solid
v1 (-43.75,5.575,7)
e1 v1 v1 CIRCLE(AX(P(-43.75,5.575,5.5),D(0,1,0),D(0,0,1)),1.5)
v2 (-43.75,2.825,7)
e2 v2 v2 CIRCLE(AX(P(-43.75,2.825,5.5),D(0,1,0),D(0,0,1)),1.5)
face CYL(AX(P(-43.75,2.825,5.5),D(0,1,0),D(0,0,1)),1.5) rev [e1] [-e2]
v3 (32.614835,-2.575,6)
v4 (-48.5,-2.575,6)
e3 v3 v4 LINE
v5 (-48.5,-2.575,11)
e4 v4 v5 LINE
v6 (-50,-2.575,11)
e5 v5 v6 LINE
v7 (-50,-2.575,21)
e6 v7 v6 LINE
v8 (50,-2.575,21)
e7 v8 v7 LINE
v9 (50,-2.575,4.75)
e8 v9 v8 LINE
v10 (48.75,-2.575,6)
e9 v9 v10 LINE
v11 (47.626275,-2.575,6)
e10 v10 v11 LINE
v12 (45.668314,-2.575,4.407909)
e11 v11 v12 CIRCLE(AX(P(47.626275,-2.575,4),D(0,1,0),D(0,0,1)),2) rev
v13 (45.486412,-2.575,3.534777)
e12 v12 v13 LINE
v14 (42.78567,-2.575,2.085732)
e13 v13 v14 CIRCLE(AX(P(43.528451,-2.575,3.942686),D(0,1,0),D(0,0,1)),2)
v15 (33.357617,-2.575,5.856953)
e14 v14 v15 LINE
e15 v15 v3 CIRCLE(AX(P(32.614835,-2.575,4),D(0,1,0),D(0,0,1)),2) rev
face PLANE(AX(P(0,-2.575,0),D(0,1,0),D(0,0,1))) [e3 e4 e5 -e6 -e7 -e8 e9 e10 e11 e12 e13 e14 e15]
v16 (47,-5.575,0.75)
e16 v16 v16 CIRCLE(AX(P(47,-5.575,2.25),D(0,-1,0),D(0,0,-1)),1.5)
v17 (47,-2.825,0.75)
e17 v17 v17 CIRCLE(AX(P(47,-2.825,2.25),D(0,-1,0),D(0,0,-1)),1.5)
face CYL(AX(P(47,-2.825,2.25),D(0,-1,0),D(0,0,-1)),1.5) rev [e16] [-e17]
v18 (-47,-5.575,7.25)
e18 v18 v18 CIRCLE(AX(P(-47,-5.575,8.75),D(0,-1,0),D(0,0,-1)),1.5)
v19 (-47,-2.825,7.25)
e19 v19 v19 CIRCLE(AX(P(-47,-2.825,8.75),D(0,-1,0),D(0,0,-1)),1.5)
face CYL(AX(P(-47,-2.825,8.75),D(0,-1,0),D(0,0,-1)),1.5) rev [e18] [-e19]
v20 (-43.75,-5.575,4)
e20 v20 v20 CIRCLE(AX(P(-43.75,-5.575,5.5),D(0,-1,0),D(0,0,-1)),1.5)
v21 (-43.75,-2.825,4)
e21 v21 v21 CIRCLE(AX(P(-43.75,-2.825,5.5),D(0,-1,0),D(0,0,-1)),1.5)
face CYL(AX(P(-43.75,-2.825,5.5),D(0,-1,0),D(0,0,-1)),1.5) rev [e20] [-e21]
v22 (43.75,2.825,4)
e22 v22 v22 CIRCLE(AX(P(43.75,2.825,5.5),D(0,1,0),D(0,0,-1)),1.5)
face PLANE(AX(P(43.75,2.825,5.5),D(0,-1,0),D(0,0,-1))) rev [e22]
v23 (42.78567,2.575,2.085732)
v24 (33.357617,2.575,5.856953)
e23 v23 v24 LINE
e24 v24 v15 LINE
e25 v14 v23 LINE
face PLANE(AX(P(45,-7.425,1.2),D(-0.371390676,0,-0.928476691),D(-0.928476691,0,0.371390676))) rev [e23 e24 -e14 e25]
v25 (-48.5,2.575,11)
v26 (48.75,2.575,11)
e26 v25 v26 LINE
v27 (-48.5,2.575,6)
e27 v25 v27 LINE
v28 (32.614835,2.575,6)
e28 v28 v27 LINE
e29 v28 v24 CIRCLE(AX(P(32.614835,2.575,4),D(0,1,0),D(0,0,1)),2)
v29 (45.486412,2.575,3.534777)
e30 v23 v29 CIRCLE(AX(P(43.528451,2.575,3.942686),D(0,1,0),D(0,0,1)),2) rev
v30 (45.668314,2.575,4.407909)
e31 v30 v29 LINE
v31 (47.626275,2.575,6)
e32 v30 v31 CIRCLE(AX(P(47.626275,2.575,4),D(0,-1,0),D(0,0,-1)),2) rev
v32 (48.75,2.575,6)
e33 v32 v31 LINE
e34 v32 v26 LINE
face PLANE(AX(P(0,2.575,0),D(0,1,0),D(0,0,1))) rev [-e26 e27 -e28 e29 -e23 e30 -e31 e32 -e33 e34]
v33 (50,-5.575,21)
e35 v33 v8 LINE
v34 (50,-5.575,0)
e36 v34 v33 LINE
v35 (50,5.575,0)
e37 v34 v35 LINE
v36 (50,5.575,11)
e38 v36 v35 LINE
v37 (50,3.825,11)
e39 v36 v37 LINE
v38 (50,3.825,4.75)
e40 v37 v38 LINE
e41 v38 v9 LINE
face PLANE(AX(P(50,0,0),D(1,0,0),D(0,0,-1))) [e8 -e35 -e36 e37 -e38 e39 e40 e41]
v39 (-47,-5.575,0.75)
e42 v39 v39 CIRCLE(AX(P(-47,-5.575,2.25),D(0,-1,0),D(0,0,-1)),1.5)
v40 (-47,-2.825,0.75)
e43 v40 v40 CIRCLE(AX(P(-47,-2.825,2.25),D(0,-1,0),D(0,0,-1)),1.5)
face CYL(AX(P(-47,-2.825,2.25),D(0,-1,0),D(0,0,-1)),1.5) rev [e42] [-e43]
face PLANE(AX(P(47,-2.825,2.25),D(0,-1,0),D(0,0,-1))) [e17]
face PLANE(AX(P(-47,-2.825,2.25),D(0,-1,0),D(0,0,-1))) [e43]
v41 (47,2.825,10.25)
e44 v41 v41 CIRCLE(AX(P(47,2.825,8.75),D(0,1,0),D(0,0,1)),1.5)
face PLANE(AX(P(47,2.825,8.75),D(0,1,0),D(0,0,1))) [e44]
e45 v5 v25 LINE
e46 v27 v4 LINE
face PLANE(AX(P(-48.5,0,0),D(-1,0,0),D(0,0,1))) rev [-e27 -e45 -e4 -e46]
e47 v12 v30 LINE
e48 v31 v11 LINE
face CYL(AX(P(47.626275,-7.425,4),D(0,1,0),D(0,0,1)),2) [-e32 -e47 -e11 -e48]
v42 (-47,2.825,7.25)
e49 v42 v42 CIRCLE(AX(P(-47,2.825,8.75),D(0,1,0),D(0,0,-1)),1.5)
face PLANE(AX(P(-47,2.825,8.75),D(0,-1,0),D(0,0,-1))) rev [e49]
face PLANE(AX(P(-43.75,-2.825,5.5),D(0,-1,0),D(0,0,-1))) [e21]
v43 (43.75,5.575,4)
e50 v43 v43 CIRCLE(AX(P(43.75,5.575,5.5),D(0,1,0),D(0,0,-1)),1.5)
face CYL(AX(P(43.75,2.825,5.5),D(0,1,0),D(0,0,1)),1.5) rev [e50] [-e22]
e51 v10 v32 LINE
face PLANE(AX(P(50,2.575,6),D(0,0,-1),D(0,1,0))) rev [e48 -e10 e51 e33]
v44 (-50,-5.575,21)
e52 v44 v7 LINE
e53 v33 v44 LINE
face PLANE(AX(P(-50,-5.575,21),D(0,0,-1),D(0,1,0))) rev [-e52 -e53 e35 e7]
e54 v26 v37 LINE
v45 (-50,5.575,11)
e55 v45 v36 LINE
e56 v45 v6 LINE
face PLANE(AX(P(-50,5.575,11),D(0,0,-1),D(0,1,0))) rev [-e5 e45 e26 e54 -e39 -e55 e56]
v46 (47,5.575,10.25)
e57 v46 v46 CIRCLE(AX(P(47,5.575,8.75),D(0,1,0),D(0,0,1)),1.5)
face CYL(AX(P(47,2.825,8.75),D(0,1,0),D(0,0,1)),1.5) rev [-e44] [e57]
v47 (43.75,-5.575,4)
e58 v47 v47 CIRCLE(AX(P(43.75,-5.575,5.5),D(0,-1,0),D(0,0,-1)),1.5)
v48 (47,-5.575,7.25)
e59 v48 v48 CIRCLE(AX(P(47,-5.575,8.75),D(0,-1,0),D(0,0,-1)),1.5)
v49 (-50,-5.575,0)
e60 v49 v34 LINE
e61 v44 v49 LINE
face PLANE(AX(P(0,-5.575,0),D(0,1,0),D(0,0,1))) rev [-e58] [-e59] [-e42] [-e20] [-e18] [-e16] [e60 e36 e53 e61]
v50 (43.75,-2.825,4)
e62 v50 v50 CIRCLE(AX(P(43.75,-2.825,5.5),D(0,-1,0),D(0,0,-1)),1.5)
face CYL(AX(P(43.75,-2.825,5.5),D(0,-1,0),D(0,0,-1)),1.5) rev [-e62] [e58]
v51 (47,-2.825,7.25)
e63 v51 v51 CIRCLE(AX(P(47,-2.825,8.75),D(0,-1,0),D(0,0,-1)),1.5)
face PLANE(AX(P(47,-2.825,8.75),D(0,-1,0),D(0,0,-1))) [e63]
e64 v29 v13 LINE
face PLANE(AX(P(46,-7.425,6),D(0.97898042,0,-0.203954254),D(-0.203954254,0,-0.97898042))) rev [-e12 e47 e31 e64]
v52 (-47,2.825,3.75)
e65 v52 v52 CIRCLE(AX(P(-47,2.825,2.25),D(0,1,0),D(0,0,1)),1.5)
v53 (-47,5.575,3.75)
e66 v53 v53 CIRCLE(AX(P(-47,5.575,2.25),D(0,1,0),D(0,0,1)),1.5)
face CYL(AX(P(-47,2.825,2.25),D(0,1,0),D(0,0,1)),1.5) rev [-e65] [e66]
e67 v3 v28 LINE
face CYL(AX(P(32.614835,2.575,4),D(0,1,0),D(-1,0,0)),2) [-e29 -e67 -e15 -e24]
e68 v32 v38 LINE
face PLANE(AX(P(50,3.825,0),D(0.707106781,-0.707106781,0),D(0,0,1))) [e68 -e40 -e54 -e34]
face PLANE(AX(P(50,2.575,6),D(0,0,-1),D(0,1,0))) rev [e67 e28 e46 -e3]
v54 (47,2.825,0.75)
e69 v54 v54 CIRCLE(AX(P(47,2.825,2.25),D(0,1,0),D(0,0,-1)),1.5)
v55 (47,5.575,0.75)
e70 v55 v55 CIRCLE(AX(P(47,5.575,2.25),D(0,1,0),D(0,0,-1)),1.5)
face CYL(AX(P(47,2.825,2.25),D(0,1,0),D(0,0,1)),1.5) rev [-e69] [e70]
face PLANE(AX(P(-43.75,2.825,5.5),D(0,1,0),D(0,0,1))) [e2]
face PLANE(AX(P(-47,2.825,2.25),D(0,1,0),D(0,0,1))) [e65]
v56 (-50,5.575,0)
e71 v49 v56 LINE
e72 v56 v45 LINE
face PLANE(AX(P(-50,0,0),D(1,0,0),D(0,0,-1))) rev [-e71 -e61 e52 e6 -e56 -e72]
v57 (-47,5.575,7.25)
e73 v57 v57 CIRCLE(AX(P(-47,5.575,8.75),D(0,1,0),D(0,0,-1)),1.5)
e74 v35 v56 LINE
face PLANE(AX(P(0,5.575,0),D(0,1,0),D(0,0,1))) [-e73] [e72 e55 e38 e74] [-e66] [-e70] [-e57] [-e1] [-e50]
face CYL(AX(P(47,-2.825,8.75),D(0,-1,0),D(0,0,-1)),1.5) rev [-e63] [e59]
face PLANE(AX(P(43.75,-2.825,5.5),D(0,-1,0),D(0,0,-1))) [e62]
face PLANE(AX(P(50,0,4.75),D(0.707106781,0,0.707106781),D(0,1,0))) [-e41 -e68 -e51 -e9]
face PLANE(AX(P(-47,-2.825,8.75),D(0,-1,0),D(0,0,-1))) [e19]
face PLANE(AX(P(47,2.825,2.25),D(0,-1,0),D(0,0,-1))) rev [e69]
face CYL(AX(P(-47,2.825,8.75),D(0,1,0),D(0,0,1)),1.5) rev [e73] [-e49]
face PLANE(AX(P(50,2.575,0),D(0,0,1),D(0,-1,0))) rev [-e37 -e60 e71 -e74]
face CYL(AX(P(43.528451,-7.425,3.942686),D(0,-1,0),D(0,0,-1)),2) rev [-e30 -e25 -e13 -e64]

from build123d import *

# Parameters (mm, degrees)
ESBO_O1_W                = 6
ESBO_O1_H                = 5.15
RESSALTO_EXTRUS_O1_DEPTH = 50
CORTE_EXTRUS_O5_START    = -2.575
CORTE_EXTRUS_O5_DEPTH    = 5.15
FILETE2_R                = 2
SKETCH1_W                = 100
SKETCH1_H                = 11
BOSS_EXTRUDE1_DEPTH      = 3
SKETCH2_W                = 100
SKETCH2_H                = 21
BOSS_EXTRUDE2_DEPTH      = 3
FILLET1_R                = 2
FILLET2_R                = 2
CUT_EXTRUDE1_START       = 2.825
CUT_EXTRUDE1_OUTLINE_R   = 1.5
CUT_EXTRUDE1_DEPTH       = 2.75
SKETCH6_W                = 5
SKETCH6_H                = 5.15
BOSS_EXTRUDE4_DEPTH      = 1.5
SKETCH8_R                = 1.5
CUT_EXTRUDE2_DEPTH       = 2.75
CHAMFER2_SIZE            = 1.25


# Read off the part's stored shape, not the designer's step: Corte-extrusão5, Cut-Extrude1
with BuildPart() as part:
    # Esboço1 → Ressalto-extrusão1 (new, symmetric)
    with BuildSketch(Plane(origin=(0, 0, 0), x_dir=(0, 0, -1), z_dir=(1, 0, 0))):
        with Locations((-3, 0)):
            Rectangle(ESBO_O1_W, ESBO_O1_H)
    extrude(amount=RESSALTO_EXTRUS_O1_DEPTH, both=True)

    # Corte-extrusão5 outline → Corte-extrusão5 (cut)
    with BuildSketch(Plane(origin=(0, 0, 0), x_dir=(1, 0, 0), z_dir=(0, 1, 0)).offset(CORTE_EXTRUS_O5_START)):
        Polygon((46, -6), (45, -1.2), (33, -6), align=None)
    extrude(amount=CORTE_EXTRUS_O5_DEPTH, mode=Mode.SUBTRACT)

    # Filete2
    filete2_edges = [part.edges().sort_by_distance(p)[0] for p in [
        (46, 0, 6),
    ]]
    fillet(filete2_edges, radius=FILETE2_R)

    # Sketch1 → Boss-Extrude1 (add)
    with BuildSketch(Plane(origin=(0, 2.575, 0), x_dir=(1, 0, 0), z_dir=(0, 1, 0))):
        with Locations((0, -5.5)):
            Rectangle(SKETCH1_W, SKETCH1_H)
    extrude(amount=BOSS_EXTRUDE1_DEPTH)

    # Sketch2 → Boss-Extrude2 (add)
    with BuildSketch(Plane.XZ.offset(2.575)):
        with Locations((0, 10.5)):
            Rectangle(SKETCH2_W, SKETCH2_H)
    extrude(amount=BOSS_EXTRUDE2_DEPTH)

    # Fillet1
    fillet1_edges = [part.edges().sort_by_distance(p)[0] for p in [
        (45, 0, 1.2),
    ]]
    fillet(fillet1_edges, radius=FILLET1_R)

    # Fillet2
    fillet2_edges = [part.edges().sort_by_distance(p)[0] for p in [
        (33, 0, 6),
    ]]
    fillet(fillet2_edges, radius=FILLET2_R)

    # Cut-Extrude1 outline → Cut-Extrude1 (cut)
    with BuildSketch(Plane(origin=(0, 0, 0), x_dir=(1, 0, 0), z_dir=(0, 1, 0)).offset(CUT_EXTRUDE1_START)):
        with Locations((-43.75, -5.5)):
            Circle(CUT_EXTRUDE1_OUTLINE_R)
        with Locations((43.75, -5.5)):
            Circle(CUT_EXTRUDE1_OUTLINE_R)
        with Locations((47, -2.25)):
            Circle(CUT_EXTRUDE1_OUTLINE_R)
        with Locations((47, -8.75)):
            Circle(CUT_EXTRUDE1_OUTLINE_R)
        with Locations((-47, -8.75)):
            Circle(CUT_EXTRUDE1_OUTLINE_R)
        with Locations((-47, -2.25)):
            Circle(CUT_EXTRUDE1_OUTLINE_R)
    extrude(amount=CUT_EXTRUDE1_DEPTH, mode=Mode.SUBTRACT)

    # Sketch6 → Boss-Extrude4 (add)
    with BuildSketch(Plane.ZY.offset(50)):
        with Locations((8.5, 0)):
            Rectangle(SKETCH6_W, SKETCH6_H)
    extrude(amount=-BOSS_EXTRUDE4_DEPTH)

    # Sketch8 → Cut-Extrude2 (cut)
    with BuildSketch(Plane.XZ.offset(5.575)):
        with Locations(Location((47, 8.75, 0), (0, 0, 90))):
            Circle(SKETCH8_R)
        with Locations(Location((43.75, 5.5, 0), (0, 0, 270))):
            Circle(SKETCH8_R)
        with Locations(Location((47, 2.25, 0), (0, 0, 270))):
            Circle(SKETCH8_R)
        with Locations(Location((-47, 8.75, 0), (0, 0, 270))):
            Circle(SKETCH8_R)
        with Locations(Location((-43.75, 5.5, 0), (0, 0, 90))):
            Circle(SKETCH8_R)
        with Locations(Location((-47, 2.25, 0), (0, 0, 90))):
            Circle(SKETCH8_R)
    extrude(amount=-CUT_EXTRUDE2_DEPTH, mode=Mode.SUBTRACT)

    # Chamfer2
    chamfer2_edges = [part.edges().sort_by_distance(p)[0] for p in [
        (50, 2.575, 8.5),
        (50, 0, 6),
    ]]
    chamfer(chamfer2_edges, length=CHAMFER2_SIZE)


solid = part.part
